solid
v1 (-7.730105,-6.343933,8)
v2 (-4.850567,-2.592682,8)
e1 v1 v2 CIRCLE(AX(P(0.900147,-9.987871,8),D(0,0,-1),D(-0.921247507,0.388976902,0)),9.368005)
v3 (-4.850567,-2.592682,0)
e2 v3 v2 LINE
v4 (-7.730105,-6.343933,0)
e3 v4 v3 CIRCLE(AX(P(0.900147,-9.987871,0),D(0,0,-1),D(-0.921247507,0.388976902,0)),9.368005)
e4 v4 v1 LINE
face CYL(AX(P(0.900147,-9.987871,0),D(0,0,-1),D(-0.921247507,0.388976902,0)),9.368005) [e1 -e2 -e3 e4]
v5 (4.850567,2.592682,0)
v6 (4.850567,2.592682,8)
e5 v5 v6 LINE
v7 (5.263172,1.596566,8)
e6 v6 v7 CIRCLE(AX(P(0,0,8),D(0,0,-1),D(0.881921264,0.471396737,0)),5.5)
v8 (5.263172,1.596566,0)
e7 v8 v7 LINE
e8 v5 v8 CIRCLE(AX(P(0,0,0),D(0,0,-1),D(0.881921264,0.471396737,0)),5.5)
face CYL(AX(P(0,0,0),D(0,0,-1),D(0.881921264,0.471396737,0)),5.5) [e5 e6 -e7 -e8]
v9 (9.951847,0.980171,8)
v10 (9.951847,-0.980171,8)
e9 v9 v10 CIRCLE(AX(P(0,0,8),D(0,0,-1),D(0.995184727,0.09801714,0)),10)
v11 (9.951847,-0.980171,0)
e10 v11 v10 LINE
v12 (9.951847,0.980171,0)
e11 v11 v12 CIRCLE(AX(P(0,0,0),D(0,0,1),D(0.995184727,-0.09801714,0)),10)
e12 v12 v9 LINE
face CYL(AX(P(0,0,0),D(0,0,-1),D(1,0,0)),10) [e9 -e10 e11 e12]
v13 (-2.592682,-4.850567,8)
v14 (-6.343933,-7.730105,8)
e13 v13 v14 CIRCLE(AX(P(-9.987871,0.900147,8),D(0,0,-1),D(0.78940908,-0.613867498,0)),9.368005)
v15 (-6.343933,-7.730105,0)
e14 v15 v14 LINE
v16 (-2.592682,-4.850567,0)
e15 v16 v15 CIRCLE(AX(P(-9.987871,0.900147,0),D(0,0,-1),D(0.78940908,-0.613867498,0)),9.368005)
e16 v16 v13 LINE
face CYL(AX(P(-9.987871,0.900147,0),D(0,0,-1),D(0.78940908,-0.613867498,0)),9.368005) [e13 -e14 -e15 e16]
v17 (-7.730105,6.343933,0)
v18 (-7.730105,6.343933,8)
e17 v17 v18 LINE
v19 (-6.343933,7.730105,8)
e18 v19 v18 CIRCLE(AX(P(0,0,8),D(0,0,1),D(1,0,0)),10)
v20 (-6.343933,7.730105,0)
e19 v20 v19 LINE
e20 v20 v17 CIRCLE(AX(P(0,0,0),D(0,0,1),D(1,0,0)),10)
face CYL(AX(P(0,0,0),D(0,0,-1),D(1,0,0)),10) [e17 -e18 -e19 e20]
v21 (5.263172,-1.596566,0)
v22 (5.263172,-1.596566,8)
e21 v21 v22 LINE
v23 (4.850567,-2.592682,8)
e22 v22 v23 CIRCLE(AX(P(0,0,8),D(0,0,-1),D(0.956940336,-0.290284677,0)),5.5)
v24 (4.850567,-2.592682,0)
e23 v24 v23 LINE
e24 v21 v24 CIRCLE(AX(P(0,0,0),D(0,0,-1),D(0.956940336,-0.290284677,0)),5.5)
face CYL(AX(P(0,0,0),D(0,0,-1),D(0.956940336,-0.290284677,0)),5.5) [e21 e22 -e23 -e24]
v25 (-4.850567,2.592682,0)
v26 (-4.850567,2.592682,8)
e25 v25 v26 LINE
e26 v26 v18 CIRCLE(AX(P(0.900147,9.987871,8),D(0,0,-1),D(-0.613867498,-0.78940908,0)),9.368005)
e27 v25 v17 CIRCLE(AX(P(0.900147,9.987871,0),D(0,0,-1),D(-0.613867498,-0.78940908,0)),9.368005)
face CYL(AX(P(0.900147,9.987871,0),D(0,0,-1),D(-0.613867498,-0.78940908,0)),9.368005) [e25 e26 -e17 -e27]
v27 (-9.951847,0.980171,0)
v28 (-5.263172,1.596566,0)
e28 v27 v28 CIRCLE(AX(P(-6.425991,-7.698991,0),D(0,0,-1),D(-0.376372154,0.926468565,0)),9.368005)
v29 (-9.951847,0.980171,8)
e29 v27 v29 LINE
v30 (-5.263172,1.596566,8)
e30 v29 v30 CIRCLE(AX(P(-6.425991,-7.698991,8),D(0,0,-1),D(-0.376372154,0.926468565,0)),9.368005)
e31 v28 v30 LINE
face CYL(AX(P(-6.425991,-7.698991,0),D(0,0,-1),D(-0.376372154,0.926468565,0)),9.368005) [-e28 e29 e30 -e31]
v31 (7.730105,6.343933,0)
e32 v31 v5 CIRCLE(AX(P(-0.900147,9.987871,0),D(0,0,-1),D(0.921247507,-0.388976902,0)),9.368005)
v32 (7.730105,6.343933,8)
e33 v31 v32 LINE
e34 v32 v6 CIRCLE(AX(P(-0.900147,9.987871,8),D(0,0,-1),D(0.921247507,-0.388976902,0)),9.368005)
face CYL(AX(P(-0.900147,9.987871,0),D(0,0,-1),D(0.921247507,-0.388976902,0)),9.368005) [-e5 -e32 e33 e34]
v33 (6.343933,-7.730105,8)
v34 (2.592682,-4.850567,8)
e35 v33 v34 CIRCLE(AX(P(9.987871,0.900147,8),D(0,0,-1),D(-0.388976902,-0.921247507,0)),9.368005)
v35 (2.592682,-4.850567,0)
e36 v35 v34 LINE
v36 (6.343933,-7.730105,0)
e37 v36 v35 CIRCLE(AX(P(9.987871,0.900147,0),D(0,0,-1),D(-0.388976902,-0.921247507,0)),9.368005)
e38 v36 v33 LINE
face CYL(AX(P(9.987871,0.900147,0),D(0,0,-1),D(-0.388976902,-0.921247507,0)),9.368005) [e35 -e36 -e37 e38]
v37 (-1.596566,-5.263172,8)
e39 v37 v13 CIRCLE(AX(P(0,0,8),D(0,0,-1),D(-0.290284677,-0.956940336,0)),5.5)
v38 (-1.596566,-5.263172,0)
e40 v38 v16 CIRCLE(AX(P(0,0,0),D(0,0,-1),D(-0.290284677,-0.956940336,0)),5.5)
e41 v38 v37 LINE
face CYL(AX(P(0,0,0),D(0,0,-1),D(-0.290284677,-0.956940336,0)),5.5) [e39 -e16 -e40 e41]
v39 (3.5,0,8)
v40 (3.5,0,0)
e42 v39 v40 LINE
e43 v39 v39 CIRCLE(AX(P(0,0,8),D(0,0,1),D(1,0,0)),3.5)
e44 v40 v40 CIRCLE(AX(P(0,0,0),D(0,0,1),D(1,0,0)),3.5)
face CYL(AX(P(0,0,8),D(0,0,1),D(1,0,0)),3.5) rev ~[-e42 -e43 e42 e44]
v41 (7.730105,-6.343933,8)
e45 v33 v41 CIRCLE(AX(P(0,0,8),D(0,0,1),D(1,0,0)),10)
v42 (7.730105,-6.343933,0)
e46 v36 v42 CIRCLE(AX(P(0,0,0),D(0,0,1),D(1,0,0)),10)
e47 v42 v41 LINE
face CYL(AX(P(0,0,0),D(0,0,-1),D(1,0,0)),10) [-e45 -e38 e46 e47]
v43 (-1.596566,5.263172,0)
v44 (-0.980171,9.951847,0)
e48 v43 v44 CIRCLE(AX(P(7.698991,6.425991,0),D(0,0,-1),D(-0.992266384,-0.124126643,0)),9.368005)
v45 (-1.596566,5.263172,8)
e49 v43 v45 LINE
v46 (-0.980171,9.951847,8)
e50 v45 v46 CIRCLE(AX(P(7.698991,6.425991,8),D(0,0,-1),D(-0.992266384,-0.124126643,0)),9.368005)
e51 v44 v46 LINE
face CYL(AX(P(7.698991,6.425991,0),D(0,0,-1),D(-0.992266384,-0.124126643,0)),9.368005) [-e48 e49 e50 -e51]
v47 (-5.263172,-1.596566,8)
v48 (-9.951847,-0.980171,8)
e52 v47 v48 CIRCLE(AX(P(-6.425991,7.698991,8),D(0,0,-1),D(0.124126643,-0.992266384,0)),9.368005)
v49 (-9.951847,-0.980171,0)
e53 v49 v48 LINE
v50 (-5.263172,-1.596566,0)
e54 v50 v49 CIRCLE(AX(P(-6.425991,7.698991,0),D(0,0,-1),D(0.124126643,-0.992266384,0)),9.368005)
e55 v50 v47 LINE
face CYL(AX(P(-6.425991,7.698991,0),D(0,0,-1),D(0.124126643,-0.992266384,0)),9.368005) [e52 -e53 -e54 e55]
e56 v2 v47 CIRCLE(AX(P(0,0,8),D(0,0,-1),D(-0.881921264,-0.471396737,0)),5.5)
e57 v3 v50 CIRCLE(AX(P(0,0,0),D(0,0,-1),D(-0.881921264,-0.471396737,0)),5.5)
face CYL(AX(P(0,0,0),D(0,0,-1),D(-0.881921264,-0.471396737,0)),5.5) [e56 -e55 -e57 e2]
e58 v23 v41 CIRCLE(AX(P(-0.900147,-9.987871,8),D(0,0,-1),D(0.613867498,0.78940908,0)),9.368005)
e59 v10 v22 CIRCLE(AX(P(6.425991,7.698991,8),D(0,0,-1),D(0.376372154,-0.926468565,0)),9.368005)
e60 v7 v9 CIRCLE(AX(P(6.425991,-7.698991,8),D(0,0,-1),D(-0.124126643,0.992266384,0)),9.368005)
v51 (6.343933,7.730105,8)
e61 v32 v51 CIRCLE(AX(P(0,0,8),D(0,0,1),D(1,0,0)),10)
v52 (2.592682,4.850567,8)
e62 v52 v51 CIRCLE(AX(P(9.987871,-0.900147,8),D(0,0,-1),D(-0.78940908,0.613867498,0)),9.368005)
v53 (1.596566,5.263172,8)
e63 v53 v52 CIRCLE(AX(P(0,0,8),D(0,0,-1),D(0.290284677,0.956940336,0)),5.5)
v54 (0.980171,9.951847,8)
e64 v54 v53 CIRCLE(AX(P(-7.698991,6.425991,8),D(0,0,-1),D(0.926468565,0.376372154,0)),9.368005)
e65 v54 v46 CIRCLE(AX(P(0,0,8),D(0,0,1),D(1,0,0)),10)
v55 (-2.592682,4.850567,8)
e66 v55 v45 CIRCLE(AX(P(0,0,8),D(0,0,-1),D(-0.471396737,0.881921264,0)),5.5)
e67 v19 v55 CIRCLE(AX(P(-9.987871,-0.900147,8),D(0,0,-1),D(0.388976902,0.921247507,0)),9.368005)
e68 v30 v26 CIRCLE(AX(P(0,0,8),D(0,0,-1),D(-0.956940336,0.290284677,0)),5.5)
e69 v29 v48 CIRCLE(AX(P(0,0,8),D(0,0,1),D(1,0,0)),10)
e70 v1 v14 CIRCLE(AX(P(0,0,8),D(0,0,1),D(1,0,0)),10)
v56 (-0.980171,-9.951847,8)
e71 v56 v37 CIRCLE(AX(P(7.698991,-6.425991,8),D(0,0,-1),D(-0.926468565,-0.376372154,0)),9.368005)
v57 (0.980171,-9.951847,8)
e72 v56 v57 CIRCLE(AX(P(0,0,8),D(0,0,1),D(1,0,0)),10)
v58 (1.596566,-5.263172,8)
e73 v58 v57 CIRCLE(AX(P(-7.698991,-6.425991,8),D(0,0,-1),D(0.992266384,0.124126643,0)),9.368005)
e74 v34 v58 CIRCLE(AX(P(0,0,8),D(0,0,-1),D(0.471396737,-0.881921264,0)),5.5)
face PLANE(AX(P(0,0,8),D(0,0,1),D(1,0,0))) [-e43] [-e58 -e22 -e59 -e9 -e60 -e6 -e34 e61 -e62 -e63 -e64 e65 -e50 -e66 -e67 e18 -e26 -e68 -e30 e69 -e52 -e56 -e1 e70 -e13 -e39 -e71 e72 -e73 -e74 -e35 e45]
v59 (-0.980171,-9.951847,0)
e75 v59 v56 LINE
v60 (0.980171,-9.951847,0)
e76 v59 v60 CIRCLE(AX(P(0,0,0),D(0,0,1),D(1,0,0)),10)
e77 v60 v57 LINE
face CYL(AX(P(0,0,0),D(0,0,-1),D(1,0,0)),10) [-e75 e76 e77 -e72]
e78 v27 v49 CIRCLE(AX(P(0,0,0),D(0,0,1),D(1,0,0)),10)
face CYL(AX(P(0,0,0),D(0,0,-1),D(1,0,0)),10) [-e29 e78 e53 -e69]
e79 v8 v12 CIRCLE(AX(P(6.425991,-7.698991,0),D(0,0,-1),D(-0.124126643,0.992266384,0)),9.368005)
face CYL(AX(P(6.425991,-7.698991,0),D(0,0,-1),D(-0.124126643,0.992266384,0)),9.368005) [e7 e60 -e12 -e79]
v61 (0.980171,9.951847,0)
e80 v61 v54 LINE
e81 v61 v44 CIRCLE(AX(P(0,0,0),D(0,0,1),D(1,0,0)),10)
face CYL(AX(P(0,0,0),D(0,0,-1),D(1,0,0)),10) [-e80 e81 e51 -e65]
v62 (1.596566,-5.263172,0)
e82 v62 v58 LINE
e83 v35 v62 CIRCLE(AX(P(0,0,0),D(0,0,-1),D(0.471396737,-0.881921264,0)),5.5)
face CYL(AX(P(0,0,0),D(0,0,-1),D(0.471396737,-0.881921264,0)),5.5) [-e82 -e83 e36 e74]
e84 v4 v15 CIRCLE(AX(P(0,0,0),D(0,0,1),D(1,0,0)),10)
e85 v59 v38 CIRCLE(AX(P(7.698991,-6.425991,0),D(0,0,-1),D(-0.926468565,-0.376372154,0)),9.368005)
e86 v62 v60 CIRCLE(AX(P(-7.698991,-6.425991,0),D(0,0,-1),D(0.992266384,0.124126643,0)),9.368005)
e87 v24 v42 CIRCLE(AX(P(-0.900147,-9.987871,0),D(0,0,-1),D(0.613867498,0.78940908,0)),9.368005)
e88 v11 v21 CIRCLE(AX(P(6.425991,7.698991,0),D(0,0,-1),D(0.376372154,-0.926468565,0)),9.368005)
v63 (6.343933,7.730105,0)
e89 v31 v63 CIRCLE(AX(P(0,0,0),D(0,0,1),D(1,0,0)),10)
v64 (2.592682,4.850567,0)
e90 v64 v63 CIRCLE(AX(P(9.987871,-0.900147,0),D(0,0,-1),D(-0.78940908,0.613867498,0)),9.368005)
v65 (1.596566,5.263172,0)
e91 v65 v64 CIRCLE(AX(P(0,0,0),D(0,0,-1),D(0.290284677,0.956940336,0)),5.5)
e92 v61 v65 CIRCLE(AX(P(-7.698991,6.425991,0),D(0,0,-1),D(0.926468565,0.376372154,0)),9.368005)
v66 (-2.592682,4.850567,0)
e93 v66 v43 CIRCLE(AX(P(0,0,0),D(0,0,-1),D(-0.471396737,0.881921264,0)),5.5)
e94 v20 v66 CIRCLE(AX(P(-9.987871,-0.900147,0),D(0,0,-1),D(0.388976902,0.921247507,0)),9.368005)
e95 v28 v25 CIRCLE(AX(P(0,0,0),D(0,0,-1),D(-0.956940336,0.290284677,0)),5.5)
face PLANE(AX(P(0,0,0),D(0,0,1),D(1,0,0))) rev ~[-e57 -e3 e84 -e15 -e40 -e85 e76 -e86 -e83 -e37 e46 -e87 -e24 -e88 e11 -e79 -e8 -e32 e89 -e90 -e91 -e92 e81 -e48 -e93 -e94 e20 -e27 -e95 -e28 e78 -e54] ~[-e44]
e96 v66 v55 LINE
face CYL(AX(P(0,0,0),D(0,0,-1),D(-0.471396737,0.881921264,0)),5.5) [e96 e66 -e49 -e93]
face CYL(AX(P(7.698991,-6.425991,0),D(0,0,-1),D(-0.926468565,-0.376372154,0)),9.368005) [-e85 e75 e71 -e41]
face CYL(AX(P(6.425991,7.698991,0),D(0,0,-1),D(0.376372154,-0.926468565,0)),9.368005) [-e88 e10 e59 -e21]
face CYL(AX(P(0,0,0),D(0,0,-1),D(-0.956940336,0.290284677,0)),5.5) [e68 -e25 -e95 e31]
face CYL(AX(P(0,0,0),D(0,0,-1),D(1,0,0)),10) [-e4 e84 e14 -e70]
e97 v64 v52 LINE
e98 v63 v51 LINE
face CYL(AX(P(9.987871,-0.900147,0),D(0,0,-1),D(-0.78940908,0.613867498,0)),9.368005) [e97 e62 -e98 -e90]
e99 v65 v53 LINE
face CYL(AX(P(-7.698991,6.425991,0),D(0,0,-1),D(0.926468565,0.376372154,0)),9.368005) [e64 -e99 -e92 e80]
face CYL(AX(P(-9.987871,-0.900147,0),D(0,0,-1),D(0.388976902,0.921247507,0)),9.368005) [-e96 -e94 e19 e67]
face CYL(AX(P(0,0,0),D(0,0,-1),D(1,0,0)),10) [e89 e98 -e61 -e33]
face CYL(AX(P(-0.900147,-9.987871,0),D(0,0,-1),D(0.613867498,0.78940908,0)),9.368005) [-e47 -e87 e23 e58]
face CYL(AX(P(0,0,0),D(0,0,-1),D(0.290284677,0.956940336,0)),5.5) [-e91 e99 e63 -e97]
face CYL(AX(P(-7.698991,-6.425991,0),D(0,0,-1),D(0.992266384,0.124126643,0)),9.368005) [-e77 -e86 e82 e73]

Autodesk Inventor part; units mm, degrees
sketch "Sketch1" plane through (0, 0, 0) normal (0, 0, 1) x (1, 0, 0)
  circle A0 centre (0, 0) radius 10
  dimension "d0" = 20
extrude "Extrusion1" add sketch "Sketch1" along normal blind 8
ref_plane "Work Plane2" through (0, 0, 4) normal (0, 0, 1) x (1, 0, 0)
sketch "Sketch2" plane through (0, 0, 0) normal (0, 0, -1) x (-1, 0, 0)
  circle A0 centre (0, 0) radius 10 projected
  circle A1 centre (0, 0) radius 8
  dimension "d3" = 16
surface extrude "Pitch Diameter" sketch "Sketch2" against normal through all shown no curves A1
ref_plane "Work Plane8" through (0, 0, 0) normal (0.9238795, 0.3826834, 0) x (0, 0, 1)
ref_plane "Work Plane9" through (0, 0, 0) normal (1, 0, 0) x (0, 1, 0)
spur gear teeth "Spur Gear" teeth 8 pitch diameter 16 tip diameter 20 root diameter 11 face width 8 start plane through (0, 0, 0) normal (0, 0, -1) x (-1, 0, 0)
sketch "Sketch3" plane through (0, 0, 8) normal (0, 0, 1) x (1, 0, 0)
  circle A0 centre (0, 0) radius 3.5
  dimension "d52" = 7
extrude "Extrusion2" cut sketch "Sketch3" against normal through all
equation "\"d0\" = da_da"
equation "\"d1\" = da_b"
equation "\"d3\" = da_d"
equation "\"d16\" = da_aw"
equation "\"d43\" = da_aw"
equation "\"d46\" = da_aw"
equation "\"da_da\" = 20"
equation "\"da_b\" = 8"
equation "\"da_d\" = 16"
equation "\"da_aw\" = 65"
properties part number "Spur Gear1" material "Steel"
